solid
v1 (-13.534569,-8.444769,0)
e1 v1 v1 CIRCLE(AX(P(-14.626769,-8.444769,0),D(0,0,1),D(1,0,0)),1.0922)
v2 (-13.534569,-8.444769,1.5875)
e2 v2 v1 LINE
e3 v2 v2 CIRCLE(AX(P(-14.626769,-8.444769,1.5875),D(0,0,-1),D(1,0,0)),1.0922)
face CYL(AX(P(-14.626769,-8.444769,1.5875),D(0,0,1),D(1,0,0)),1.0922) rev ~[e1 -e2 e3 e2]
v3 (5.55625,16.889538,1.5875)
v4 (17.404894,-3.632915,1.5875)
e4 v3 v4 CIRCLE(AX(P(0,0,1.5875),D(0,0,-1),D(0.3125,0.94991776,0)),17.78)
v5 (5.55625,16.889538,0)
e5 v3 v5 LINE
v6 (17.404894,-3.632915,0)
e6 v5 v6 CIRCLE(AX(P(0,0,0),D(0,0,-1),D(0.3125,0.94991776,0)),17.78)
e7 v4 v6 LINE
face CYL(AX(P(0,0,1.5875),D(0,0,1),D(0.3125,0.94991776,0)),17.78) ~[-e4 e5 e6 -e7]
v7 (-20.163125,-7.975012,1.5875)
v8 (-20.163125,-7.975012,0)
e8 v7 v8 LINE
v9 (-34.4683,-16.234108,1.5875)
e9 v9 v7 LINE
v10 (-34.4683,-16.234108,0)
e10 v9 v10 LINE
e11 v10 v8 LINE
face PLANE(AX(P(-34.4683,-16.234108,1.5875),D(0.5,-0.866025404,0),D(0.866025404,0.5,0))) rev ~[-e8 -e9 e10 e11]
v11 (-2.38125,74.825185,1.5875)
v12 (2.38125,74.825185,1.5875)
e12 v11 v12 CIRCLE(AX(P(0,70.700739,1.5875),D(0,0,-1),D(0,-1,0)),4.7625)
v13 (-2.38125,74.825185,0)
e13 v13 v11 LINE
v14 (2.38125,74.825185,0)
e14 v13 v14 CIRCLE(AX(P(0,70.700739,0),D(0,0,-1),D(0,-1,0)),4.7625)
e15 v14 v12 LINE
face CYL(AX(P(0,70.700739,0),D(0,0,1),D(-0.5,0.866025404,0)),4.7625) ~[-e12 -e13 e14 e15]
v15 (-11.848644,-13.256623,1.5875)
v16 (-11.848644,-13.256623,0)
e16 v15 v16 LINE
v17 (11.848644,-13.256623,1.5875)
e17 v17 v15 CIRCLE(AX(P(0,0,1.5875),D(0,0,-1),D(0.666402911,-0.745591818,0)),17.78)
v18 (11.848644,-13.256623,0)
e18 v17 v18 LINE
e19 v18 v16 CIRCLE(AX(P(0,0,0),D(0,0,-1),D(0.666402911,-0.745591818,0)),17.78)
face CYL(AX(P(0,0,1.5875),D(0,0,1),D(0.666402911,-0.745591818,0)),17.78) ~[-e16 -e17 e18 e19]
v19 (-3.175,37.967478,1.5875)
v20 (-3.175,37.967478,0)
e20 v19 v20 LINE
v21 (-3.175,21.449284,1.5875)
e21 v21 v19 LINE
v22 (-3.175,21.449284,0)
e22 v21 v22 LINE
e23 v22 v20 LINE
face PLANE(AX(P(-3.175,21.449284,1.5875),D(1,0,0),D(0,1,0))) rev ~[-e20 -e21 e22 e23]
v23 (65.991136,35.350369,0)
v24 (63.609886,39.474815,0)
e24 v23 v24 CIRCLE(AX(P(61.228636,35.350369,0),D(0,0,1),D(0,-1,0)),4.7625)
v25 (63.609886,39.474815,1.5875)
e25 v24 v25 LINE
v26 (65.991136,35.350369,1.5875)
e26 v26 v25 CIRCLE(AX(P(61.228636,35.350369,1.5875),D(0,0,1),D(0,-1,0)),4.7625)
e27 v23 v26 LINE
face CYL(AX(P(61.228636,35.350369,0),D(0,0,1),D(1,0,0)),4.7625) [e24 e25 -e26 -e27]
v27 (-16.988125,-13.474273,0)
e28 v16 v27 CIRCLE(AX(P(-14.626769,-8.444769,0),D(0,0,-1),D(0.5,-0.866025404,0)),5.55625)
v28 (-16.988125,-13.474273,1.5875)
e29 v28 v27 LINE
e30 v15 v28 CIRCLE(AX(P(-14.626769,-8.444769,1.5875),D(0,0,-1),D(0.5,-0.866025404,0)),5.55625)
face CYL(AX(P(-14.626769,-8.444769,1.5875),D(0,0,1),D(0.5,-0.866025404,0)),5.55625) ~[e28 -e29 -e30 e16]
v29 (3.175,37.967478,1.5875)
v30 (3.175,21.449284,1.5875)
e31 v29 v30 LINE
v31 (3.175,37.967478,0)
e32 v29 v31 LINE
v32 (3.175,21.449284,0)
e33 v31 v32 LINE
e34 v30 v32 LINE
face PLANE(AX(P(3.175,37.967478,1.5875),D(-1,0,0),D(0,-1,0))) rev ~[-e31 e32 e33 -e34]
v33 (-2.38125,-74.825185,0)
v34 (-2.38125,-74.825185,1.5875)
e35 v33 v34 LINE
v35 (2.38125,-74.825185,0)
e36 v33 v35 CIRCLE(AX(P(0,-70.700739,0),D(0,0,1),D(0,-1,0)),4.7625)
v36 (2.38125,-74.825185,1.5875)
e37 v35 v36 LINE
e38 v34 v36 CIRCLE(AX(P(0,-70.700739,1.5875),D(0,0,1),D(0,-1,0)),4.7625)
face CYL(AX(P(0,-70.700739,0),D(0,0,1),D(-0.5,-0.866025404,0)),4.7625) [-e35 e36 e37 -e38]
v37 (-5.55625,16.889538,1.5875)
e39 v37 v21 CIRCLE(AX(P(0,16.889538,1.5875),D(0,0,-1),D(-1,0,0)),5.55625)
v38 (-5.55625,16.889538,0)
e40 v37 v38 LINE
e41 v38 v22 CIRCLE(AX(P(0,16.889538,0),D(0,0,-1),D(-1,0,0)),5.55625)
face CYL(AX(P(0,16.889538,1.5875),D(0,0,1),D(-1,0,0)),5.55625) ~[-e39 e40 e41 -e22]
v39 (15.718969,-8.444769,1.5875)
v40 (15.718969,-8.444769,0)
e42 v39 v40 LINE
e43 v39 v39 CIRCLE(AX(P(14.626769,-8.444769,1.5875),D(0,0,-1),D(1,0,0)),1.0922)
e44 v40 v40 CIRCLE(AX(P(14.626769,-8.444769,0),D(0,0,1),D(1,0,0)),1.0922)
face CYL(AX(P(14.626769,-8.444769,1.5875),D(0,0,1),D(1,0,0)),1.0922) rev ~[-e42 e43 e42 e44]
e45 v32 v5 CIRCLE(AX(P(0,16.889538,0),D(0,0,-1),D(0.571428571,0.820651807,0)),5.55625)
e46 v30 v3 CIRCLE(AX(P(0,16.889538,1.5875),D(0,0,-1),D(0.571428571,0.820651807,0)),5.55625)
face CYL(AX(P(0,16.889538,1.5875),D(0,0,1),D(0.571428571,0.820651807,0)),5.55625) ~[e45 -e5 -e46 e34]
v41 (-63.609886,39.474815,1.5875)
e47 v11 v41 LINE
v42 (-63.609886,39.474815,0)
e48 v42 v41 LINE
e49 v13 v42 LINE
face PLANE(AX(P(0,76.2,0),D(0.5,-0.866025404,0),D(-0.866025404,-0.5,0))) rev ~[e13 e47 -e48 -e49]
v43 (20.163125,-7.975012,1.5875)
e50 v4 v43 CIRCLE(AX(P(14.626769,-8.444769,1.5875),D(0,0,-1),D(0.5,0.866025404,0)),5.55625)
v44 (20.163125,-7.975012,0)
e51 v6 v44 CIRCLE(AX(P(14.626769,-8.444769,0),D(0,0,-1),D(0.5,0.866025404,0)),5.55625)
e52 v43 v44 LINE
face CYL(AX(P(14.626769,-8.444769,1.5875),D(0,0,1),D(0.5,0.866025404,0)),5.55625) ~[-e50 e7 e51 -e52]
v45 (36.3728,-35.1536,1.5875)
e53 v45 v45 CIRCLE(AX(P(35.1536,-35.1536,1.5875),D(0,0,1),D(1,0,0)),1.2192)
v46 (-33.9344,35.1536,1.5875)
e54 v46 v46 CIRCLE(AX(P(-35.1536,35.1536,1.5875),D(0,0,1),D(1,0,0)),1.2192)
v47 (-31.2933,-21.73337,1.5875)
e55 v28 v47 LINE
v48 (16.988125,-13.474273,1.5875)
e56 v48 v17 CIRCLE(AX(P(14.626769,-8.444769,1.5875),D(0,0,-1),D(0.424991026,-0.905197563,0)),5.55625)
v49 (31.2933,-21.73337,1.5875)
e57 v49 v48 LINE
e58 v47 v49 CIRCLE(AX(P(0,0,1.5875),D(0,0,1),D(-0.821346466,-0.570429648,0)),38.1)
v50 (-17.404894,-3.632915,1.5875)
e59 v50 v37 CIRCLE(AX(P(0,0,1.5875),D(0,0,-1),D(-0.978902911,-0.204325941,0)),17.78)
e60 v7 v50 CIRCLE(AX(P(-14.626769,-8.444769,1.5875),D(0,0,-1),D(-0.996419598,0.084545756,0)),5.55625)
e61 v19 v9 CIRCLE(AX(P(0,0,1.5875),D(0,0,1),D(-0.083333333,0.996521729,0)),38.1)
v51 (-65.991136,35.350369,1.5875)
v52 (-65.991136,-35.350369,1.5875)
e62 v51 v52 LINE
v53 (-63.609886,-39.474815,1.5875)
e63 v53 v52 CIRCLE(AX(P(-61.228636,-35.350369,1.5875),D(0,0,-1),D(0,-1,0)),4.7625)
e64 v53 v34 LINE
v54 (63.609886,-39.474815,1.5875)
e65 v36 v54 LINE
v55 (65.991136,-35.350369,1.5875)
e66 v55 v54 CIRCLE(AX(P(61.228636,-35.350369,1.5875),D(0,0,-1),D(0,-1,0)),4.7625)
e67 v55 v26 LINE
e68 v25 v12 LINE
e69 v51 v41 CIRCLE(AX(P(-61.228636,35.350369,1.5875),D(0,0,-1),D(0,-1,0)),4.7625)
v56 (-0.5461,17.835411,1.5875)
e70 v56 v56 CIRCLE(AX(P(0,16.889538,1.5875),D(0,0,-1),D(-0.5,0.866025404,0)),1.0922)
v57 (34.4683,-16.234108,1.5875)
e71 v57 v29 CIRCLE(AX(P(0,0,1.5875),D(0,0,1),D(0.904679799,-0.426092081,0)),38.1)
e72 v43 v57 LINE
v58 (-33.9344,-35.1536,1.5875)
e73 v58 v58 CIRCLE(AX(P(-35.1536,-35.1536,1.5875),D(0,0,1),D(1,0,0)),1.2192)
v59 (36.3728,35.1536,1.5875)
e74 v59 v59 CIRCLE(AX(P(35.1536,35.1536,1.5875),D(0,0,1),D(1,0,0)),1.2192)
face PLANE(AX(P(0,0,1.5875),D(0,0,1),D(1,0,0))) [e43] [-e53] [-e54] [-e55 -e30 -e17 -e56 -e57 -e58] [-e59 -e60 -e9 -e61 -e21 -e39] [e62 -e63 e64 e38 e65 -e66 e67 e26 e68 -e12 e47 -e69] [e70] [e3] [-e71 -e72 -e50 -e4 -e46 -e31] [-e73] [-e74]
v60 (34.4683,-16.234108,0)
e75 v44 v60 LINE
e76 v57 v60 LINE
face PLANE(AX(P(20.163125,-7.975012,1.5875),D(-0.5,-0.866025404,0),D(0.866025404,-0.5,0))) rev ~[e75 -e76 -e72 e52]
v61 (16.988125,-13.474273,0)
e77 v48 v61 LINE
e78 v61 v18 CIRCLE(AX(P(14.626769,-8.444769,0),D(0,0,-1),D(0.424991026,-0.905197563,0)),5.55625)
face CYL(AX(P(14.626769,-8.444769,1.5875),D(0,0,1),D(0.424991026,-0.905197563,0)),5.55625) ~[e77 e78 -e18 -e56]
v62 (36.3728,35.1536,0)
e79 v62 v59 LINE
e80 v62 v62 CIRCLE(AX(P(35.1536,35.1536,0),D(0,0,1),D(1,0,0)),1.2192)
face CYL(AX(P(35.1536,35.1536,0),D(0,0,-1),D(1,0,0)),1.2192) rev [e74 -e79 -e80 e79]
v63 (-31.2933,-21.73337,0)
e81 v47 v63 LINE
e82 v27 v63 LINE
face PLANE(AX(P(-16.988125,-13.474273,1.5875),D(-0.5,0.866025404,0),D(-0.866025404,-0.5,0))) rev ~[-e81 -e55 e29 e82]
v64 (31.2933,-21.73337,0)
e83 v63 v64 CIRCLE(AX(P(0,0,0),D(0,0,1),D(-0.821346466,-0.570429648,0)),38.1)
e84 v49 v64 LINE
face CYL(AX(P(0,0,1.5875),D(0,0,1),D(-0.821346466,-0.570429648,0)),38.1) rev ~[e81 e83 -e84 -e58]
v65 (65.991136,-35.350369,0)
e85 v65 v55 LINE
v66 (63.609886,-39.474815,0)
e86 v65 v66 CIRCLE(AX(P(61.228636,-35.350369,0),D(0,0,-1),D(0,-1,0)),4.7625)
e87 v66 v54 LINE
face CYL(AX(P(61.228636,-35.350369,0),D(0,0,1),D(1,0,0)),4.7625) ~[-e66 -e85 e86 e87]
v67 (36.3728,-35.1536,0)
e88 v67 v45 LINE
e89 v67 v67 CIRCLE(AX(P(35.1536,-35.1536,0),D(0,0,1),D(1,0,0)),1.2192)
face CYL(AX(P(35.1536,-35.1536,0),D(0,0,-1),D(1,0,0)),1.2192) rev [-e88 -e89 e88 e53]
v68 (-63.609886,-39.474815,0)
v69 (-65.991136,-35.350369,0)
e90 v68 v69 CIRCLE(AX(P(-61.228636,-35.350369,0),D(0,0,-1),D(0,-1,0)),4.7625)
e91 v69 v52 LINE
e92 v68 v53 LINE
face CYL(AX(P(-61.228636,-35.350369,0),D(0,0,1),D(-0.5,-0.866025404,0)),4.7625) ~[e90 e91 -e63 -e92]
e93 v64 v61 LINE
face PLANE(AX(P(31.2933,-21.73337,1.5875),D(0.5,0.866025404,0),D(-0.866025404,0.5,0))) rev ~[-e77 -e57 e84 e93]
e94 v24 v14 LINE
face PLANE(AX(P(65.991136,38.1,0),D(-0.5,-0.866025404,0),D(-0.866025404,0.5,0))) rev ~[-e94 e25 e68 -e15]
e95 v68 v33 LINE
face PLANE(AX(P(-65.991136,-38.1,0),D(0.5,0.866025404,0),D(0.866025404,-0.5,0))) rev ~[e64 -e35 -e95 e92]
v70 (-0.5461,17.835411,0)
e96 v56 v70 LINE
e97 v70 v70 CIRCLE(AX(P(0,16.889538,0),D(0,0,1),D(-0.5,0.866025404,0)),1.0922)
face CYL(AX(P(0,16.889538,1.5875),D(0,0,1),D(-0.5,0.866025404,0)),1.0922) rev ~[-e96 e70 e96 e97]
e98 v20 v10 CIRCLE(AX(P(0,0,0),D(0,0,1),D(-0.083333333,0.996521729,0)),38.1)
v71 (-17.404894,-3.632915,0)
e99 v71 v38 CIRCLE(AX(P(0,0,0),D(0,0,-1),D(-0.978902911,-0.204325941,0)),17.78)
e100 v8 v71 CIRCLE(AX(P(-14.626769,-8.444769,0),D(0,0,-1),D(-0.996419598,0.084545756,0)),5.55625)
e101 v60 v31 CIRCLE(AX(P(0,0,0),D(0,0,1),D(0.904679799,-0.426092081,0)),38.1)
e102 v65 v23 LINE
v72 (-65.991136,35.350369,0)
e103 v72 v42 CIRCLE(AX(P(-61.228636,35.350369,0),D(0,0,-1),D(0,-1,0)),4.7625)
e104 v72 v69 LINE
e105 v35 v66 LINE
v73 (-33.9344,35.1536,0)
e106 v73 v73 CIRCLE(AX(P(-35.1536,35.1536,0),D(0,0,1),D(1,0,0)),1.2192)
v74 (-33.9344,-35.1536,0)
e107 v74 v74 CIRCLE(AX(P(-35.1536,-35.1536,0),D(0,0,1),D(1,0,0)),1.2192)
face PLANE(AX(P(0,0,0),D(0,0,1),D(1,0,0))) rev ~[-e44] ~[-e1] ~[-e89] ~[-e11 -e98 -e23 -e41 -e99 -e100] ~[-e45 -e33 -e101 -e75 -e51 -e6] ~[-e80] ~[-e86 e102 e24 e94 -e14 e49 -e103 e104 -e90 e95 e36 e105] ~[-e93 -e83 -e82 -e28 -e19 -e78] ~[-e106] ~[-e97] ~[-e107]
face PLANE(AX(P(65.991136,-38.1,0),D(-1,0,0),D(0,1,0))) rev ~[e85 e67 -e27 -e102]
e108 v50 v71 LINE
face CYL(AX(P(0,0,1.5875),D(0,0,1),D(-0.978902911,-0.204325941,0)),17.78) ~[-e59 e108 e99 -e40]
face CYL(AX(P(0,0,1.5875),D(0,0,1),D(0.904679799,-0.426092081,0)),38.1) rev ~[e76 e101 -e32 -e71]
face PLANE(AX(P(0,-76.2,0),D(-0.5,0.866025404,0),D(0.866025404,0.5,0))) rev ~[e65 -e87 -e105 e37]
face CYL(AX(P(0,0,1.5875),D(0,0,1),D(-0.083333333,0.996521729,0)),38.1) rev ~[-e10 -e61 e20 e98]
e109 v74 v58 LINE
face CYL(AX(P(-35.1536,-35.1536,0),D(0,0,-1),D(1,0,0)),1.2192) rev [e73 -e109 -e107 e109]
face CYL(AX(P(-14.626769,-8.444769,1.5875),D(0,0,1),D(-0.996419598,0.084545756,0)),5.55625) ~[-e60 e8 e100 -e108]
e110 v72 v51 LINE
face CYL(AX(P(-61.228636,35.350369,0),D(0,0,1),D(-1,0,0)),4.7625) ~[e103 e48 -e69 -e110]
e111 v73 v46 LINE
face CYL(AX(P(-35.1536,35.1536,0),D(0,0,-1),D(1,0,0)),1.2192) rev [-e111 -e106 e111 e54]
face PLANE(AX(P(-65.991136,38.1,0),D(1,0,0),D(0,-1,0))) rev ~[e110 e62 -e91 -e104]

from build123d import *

# Parameters (mm, degrees)
F0_R            = 1.2192
F1_DEPTH        = 1.5875
F2_R            = 1.0922
F3_DEPTH        = 1.5875
F3_COPIES_COUNT = 3
F4_R            = 4.7625


# Not quite as in the source:
# - a pattern or mirror of a feature is missing from the dataset's text; its kind, count and spacing are read off the source's solid


with BuildPart() as f1:
    # F0 (on Top) → F1 (new body)
    with BuildSketch(Plane.XY):
        Polygon((65.9911357684, -38.1), (65.9911357684, 38.1), (0, 76.2), (-65.9911357684, 38.1), (-65.9911357684, -38.1), (0, -76.2), align=None)
        with Locations((-35.1536, -35.1536)):
            Circle(F0_R, mode=Mode.SUBTRACT)
        with Locations((35.1536, -35.1536)):
            Circle(F0_R, mode=Mode.SUBTRACT)
        with Locations((-35.1536, 35.1536)):
            Circle(F0_R, mode=Mode.SUBTRACT)
        with Locations((35.1536, 35.1536)):
            Circle(F0_R, mode=Mode.SUBTRACT)
    extrude(amount=F1_DEPTH)

    # F2 (on face) → F3 (cut, through all)
    with BuildSketch(Plane.XY.offset(1.5875)):
        with BuildLine():
            ThreePointArc((11.8486437632, -13.2566225326), (0, -17.78), (-11.8486437632, -13.2566225326))
            ThreePointArc((-11.8486437632, -13.2566225326), (-14.3916795622, -13.9960432527), (-16.9881251543, -13.4742728402))
            Line((-16.9881251543, -13.4742728402), (-31.2933003438, -21.7333695867))
            ThreePointArc((-31.2933003438, -21.7333695867), (0, -38.1), (31.2933003438, -21.7333695867))
            Line((31.2933003438, -21.7333695867), (16.9881251543, -13.4742728402))
            ThreePointArc((16.9881251543, -13.4742728402), (14.3916795622, -13.9960432527), (11.8486437632, -13.2566225326))
        make_face()
        with Locations((14.6267687632, -8.4447688828)):
            Circle(F2_R)
        with Locations((-14.6267687632, -8.4447688828)):
            Circle(F2_R)
    f3 = extrude(amount=-F3_DEPTH, mode=Mode.SUBTRACT)

    # F3_copies: F3 ×3 about axis
    f3_copies_axis = Axis((0, 0, 0), (0, 0, 1))
    for i in range(1, F3_COPIES_COUNT):
        add(f3.rotate(f3_copies_axis, i * 360 / F3_COPIES_COUNT), mode=Mode.SUBTRACT)

    # F4
    f4_edges = [f1.edges().sort_by_distance(p)[0] for p in [
        (-65.991136, 38.1, 0.79375),
        (0, 76.2, 0.79375),
        (65.991136, 38.1, 0.79375),
        (65.991136, -38.1, 0.79375),
        (0, -76.2, 0.79375),
        (-65.991136, -38.1, 0.79375),
    ]]
    fillet(f4_edges, radius=F4_R)


solid = f1.part
